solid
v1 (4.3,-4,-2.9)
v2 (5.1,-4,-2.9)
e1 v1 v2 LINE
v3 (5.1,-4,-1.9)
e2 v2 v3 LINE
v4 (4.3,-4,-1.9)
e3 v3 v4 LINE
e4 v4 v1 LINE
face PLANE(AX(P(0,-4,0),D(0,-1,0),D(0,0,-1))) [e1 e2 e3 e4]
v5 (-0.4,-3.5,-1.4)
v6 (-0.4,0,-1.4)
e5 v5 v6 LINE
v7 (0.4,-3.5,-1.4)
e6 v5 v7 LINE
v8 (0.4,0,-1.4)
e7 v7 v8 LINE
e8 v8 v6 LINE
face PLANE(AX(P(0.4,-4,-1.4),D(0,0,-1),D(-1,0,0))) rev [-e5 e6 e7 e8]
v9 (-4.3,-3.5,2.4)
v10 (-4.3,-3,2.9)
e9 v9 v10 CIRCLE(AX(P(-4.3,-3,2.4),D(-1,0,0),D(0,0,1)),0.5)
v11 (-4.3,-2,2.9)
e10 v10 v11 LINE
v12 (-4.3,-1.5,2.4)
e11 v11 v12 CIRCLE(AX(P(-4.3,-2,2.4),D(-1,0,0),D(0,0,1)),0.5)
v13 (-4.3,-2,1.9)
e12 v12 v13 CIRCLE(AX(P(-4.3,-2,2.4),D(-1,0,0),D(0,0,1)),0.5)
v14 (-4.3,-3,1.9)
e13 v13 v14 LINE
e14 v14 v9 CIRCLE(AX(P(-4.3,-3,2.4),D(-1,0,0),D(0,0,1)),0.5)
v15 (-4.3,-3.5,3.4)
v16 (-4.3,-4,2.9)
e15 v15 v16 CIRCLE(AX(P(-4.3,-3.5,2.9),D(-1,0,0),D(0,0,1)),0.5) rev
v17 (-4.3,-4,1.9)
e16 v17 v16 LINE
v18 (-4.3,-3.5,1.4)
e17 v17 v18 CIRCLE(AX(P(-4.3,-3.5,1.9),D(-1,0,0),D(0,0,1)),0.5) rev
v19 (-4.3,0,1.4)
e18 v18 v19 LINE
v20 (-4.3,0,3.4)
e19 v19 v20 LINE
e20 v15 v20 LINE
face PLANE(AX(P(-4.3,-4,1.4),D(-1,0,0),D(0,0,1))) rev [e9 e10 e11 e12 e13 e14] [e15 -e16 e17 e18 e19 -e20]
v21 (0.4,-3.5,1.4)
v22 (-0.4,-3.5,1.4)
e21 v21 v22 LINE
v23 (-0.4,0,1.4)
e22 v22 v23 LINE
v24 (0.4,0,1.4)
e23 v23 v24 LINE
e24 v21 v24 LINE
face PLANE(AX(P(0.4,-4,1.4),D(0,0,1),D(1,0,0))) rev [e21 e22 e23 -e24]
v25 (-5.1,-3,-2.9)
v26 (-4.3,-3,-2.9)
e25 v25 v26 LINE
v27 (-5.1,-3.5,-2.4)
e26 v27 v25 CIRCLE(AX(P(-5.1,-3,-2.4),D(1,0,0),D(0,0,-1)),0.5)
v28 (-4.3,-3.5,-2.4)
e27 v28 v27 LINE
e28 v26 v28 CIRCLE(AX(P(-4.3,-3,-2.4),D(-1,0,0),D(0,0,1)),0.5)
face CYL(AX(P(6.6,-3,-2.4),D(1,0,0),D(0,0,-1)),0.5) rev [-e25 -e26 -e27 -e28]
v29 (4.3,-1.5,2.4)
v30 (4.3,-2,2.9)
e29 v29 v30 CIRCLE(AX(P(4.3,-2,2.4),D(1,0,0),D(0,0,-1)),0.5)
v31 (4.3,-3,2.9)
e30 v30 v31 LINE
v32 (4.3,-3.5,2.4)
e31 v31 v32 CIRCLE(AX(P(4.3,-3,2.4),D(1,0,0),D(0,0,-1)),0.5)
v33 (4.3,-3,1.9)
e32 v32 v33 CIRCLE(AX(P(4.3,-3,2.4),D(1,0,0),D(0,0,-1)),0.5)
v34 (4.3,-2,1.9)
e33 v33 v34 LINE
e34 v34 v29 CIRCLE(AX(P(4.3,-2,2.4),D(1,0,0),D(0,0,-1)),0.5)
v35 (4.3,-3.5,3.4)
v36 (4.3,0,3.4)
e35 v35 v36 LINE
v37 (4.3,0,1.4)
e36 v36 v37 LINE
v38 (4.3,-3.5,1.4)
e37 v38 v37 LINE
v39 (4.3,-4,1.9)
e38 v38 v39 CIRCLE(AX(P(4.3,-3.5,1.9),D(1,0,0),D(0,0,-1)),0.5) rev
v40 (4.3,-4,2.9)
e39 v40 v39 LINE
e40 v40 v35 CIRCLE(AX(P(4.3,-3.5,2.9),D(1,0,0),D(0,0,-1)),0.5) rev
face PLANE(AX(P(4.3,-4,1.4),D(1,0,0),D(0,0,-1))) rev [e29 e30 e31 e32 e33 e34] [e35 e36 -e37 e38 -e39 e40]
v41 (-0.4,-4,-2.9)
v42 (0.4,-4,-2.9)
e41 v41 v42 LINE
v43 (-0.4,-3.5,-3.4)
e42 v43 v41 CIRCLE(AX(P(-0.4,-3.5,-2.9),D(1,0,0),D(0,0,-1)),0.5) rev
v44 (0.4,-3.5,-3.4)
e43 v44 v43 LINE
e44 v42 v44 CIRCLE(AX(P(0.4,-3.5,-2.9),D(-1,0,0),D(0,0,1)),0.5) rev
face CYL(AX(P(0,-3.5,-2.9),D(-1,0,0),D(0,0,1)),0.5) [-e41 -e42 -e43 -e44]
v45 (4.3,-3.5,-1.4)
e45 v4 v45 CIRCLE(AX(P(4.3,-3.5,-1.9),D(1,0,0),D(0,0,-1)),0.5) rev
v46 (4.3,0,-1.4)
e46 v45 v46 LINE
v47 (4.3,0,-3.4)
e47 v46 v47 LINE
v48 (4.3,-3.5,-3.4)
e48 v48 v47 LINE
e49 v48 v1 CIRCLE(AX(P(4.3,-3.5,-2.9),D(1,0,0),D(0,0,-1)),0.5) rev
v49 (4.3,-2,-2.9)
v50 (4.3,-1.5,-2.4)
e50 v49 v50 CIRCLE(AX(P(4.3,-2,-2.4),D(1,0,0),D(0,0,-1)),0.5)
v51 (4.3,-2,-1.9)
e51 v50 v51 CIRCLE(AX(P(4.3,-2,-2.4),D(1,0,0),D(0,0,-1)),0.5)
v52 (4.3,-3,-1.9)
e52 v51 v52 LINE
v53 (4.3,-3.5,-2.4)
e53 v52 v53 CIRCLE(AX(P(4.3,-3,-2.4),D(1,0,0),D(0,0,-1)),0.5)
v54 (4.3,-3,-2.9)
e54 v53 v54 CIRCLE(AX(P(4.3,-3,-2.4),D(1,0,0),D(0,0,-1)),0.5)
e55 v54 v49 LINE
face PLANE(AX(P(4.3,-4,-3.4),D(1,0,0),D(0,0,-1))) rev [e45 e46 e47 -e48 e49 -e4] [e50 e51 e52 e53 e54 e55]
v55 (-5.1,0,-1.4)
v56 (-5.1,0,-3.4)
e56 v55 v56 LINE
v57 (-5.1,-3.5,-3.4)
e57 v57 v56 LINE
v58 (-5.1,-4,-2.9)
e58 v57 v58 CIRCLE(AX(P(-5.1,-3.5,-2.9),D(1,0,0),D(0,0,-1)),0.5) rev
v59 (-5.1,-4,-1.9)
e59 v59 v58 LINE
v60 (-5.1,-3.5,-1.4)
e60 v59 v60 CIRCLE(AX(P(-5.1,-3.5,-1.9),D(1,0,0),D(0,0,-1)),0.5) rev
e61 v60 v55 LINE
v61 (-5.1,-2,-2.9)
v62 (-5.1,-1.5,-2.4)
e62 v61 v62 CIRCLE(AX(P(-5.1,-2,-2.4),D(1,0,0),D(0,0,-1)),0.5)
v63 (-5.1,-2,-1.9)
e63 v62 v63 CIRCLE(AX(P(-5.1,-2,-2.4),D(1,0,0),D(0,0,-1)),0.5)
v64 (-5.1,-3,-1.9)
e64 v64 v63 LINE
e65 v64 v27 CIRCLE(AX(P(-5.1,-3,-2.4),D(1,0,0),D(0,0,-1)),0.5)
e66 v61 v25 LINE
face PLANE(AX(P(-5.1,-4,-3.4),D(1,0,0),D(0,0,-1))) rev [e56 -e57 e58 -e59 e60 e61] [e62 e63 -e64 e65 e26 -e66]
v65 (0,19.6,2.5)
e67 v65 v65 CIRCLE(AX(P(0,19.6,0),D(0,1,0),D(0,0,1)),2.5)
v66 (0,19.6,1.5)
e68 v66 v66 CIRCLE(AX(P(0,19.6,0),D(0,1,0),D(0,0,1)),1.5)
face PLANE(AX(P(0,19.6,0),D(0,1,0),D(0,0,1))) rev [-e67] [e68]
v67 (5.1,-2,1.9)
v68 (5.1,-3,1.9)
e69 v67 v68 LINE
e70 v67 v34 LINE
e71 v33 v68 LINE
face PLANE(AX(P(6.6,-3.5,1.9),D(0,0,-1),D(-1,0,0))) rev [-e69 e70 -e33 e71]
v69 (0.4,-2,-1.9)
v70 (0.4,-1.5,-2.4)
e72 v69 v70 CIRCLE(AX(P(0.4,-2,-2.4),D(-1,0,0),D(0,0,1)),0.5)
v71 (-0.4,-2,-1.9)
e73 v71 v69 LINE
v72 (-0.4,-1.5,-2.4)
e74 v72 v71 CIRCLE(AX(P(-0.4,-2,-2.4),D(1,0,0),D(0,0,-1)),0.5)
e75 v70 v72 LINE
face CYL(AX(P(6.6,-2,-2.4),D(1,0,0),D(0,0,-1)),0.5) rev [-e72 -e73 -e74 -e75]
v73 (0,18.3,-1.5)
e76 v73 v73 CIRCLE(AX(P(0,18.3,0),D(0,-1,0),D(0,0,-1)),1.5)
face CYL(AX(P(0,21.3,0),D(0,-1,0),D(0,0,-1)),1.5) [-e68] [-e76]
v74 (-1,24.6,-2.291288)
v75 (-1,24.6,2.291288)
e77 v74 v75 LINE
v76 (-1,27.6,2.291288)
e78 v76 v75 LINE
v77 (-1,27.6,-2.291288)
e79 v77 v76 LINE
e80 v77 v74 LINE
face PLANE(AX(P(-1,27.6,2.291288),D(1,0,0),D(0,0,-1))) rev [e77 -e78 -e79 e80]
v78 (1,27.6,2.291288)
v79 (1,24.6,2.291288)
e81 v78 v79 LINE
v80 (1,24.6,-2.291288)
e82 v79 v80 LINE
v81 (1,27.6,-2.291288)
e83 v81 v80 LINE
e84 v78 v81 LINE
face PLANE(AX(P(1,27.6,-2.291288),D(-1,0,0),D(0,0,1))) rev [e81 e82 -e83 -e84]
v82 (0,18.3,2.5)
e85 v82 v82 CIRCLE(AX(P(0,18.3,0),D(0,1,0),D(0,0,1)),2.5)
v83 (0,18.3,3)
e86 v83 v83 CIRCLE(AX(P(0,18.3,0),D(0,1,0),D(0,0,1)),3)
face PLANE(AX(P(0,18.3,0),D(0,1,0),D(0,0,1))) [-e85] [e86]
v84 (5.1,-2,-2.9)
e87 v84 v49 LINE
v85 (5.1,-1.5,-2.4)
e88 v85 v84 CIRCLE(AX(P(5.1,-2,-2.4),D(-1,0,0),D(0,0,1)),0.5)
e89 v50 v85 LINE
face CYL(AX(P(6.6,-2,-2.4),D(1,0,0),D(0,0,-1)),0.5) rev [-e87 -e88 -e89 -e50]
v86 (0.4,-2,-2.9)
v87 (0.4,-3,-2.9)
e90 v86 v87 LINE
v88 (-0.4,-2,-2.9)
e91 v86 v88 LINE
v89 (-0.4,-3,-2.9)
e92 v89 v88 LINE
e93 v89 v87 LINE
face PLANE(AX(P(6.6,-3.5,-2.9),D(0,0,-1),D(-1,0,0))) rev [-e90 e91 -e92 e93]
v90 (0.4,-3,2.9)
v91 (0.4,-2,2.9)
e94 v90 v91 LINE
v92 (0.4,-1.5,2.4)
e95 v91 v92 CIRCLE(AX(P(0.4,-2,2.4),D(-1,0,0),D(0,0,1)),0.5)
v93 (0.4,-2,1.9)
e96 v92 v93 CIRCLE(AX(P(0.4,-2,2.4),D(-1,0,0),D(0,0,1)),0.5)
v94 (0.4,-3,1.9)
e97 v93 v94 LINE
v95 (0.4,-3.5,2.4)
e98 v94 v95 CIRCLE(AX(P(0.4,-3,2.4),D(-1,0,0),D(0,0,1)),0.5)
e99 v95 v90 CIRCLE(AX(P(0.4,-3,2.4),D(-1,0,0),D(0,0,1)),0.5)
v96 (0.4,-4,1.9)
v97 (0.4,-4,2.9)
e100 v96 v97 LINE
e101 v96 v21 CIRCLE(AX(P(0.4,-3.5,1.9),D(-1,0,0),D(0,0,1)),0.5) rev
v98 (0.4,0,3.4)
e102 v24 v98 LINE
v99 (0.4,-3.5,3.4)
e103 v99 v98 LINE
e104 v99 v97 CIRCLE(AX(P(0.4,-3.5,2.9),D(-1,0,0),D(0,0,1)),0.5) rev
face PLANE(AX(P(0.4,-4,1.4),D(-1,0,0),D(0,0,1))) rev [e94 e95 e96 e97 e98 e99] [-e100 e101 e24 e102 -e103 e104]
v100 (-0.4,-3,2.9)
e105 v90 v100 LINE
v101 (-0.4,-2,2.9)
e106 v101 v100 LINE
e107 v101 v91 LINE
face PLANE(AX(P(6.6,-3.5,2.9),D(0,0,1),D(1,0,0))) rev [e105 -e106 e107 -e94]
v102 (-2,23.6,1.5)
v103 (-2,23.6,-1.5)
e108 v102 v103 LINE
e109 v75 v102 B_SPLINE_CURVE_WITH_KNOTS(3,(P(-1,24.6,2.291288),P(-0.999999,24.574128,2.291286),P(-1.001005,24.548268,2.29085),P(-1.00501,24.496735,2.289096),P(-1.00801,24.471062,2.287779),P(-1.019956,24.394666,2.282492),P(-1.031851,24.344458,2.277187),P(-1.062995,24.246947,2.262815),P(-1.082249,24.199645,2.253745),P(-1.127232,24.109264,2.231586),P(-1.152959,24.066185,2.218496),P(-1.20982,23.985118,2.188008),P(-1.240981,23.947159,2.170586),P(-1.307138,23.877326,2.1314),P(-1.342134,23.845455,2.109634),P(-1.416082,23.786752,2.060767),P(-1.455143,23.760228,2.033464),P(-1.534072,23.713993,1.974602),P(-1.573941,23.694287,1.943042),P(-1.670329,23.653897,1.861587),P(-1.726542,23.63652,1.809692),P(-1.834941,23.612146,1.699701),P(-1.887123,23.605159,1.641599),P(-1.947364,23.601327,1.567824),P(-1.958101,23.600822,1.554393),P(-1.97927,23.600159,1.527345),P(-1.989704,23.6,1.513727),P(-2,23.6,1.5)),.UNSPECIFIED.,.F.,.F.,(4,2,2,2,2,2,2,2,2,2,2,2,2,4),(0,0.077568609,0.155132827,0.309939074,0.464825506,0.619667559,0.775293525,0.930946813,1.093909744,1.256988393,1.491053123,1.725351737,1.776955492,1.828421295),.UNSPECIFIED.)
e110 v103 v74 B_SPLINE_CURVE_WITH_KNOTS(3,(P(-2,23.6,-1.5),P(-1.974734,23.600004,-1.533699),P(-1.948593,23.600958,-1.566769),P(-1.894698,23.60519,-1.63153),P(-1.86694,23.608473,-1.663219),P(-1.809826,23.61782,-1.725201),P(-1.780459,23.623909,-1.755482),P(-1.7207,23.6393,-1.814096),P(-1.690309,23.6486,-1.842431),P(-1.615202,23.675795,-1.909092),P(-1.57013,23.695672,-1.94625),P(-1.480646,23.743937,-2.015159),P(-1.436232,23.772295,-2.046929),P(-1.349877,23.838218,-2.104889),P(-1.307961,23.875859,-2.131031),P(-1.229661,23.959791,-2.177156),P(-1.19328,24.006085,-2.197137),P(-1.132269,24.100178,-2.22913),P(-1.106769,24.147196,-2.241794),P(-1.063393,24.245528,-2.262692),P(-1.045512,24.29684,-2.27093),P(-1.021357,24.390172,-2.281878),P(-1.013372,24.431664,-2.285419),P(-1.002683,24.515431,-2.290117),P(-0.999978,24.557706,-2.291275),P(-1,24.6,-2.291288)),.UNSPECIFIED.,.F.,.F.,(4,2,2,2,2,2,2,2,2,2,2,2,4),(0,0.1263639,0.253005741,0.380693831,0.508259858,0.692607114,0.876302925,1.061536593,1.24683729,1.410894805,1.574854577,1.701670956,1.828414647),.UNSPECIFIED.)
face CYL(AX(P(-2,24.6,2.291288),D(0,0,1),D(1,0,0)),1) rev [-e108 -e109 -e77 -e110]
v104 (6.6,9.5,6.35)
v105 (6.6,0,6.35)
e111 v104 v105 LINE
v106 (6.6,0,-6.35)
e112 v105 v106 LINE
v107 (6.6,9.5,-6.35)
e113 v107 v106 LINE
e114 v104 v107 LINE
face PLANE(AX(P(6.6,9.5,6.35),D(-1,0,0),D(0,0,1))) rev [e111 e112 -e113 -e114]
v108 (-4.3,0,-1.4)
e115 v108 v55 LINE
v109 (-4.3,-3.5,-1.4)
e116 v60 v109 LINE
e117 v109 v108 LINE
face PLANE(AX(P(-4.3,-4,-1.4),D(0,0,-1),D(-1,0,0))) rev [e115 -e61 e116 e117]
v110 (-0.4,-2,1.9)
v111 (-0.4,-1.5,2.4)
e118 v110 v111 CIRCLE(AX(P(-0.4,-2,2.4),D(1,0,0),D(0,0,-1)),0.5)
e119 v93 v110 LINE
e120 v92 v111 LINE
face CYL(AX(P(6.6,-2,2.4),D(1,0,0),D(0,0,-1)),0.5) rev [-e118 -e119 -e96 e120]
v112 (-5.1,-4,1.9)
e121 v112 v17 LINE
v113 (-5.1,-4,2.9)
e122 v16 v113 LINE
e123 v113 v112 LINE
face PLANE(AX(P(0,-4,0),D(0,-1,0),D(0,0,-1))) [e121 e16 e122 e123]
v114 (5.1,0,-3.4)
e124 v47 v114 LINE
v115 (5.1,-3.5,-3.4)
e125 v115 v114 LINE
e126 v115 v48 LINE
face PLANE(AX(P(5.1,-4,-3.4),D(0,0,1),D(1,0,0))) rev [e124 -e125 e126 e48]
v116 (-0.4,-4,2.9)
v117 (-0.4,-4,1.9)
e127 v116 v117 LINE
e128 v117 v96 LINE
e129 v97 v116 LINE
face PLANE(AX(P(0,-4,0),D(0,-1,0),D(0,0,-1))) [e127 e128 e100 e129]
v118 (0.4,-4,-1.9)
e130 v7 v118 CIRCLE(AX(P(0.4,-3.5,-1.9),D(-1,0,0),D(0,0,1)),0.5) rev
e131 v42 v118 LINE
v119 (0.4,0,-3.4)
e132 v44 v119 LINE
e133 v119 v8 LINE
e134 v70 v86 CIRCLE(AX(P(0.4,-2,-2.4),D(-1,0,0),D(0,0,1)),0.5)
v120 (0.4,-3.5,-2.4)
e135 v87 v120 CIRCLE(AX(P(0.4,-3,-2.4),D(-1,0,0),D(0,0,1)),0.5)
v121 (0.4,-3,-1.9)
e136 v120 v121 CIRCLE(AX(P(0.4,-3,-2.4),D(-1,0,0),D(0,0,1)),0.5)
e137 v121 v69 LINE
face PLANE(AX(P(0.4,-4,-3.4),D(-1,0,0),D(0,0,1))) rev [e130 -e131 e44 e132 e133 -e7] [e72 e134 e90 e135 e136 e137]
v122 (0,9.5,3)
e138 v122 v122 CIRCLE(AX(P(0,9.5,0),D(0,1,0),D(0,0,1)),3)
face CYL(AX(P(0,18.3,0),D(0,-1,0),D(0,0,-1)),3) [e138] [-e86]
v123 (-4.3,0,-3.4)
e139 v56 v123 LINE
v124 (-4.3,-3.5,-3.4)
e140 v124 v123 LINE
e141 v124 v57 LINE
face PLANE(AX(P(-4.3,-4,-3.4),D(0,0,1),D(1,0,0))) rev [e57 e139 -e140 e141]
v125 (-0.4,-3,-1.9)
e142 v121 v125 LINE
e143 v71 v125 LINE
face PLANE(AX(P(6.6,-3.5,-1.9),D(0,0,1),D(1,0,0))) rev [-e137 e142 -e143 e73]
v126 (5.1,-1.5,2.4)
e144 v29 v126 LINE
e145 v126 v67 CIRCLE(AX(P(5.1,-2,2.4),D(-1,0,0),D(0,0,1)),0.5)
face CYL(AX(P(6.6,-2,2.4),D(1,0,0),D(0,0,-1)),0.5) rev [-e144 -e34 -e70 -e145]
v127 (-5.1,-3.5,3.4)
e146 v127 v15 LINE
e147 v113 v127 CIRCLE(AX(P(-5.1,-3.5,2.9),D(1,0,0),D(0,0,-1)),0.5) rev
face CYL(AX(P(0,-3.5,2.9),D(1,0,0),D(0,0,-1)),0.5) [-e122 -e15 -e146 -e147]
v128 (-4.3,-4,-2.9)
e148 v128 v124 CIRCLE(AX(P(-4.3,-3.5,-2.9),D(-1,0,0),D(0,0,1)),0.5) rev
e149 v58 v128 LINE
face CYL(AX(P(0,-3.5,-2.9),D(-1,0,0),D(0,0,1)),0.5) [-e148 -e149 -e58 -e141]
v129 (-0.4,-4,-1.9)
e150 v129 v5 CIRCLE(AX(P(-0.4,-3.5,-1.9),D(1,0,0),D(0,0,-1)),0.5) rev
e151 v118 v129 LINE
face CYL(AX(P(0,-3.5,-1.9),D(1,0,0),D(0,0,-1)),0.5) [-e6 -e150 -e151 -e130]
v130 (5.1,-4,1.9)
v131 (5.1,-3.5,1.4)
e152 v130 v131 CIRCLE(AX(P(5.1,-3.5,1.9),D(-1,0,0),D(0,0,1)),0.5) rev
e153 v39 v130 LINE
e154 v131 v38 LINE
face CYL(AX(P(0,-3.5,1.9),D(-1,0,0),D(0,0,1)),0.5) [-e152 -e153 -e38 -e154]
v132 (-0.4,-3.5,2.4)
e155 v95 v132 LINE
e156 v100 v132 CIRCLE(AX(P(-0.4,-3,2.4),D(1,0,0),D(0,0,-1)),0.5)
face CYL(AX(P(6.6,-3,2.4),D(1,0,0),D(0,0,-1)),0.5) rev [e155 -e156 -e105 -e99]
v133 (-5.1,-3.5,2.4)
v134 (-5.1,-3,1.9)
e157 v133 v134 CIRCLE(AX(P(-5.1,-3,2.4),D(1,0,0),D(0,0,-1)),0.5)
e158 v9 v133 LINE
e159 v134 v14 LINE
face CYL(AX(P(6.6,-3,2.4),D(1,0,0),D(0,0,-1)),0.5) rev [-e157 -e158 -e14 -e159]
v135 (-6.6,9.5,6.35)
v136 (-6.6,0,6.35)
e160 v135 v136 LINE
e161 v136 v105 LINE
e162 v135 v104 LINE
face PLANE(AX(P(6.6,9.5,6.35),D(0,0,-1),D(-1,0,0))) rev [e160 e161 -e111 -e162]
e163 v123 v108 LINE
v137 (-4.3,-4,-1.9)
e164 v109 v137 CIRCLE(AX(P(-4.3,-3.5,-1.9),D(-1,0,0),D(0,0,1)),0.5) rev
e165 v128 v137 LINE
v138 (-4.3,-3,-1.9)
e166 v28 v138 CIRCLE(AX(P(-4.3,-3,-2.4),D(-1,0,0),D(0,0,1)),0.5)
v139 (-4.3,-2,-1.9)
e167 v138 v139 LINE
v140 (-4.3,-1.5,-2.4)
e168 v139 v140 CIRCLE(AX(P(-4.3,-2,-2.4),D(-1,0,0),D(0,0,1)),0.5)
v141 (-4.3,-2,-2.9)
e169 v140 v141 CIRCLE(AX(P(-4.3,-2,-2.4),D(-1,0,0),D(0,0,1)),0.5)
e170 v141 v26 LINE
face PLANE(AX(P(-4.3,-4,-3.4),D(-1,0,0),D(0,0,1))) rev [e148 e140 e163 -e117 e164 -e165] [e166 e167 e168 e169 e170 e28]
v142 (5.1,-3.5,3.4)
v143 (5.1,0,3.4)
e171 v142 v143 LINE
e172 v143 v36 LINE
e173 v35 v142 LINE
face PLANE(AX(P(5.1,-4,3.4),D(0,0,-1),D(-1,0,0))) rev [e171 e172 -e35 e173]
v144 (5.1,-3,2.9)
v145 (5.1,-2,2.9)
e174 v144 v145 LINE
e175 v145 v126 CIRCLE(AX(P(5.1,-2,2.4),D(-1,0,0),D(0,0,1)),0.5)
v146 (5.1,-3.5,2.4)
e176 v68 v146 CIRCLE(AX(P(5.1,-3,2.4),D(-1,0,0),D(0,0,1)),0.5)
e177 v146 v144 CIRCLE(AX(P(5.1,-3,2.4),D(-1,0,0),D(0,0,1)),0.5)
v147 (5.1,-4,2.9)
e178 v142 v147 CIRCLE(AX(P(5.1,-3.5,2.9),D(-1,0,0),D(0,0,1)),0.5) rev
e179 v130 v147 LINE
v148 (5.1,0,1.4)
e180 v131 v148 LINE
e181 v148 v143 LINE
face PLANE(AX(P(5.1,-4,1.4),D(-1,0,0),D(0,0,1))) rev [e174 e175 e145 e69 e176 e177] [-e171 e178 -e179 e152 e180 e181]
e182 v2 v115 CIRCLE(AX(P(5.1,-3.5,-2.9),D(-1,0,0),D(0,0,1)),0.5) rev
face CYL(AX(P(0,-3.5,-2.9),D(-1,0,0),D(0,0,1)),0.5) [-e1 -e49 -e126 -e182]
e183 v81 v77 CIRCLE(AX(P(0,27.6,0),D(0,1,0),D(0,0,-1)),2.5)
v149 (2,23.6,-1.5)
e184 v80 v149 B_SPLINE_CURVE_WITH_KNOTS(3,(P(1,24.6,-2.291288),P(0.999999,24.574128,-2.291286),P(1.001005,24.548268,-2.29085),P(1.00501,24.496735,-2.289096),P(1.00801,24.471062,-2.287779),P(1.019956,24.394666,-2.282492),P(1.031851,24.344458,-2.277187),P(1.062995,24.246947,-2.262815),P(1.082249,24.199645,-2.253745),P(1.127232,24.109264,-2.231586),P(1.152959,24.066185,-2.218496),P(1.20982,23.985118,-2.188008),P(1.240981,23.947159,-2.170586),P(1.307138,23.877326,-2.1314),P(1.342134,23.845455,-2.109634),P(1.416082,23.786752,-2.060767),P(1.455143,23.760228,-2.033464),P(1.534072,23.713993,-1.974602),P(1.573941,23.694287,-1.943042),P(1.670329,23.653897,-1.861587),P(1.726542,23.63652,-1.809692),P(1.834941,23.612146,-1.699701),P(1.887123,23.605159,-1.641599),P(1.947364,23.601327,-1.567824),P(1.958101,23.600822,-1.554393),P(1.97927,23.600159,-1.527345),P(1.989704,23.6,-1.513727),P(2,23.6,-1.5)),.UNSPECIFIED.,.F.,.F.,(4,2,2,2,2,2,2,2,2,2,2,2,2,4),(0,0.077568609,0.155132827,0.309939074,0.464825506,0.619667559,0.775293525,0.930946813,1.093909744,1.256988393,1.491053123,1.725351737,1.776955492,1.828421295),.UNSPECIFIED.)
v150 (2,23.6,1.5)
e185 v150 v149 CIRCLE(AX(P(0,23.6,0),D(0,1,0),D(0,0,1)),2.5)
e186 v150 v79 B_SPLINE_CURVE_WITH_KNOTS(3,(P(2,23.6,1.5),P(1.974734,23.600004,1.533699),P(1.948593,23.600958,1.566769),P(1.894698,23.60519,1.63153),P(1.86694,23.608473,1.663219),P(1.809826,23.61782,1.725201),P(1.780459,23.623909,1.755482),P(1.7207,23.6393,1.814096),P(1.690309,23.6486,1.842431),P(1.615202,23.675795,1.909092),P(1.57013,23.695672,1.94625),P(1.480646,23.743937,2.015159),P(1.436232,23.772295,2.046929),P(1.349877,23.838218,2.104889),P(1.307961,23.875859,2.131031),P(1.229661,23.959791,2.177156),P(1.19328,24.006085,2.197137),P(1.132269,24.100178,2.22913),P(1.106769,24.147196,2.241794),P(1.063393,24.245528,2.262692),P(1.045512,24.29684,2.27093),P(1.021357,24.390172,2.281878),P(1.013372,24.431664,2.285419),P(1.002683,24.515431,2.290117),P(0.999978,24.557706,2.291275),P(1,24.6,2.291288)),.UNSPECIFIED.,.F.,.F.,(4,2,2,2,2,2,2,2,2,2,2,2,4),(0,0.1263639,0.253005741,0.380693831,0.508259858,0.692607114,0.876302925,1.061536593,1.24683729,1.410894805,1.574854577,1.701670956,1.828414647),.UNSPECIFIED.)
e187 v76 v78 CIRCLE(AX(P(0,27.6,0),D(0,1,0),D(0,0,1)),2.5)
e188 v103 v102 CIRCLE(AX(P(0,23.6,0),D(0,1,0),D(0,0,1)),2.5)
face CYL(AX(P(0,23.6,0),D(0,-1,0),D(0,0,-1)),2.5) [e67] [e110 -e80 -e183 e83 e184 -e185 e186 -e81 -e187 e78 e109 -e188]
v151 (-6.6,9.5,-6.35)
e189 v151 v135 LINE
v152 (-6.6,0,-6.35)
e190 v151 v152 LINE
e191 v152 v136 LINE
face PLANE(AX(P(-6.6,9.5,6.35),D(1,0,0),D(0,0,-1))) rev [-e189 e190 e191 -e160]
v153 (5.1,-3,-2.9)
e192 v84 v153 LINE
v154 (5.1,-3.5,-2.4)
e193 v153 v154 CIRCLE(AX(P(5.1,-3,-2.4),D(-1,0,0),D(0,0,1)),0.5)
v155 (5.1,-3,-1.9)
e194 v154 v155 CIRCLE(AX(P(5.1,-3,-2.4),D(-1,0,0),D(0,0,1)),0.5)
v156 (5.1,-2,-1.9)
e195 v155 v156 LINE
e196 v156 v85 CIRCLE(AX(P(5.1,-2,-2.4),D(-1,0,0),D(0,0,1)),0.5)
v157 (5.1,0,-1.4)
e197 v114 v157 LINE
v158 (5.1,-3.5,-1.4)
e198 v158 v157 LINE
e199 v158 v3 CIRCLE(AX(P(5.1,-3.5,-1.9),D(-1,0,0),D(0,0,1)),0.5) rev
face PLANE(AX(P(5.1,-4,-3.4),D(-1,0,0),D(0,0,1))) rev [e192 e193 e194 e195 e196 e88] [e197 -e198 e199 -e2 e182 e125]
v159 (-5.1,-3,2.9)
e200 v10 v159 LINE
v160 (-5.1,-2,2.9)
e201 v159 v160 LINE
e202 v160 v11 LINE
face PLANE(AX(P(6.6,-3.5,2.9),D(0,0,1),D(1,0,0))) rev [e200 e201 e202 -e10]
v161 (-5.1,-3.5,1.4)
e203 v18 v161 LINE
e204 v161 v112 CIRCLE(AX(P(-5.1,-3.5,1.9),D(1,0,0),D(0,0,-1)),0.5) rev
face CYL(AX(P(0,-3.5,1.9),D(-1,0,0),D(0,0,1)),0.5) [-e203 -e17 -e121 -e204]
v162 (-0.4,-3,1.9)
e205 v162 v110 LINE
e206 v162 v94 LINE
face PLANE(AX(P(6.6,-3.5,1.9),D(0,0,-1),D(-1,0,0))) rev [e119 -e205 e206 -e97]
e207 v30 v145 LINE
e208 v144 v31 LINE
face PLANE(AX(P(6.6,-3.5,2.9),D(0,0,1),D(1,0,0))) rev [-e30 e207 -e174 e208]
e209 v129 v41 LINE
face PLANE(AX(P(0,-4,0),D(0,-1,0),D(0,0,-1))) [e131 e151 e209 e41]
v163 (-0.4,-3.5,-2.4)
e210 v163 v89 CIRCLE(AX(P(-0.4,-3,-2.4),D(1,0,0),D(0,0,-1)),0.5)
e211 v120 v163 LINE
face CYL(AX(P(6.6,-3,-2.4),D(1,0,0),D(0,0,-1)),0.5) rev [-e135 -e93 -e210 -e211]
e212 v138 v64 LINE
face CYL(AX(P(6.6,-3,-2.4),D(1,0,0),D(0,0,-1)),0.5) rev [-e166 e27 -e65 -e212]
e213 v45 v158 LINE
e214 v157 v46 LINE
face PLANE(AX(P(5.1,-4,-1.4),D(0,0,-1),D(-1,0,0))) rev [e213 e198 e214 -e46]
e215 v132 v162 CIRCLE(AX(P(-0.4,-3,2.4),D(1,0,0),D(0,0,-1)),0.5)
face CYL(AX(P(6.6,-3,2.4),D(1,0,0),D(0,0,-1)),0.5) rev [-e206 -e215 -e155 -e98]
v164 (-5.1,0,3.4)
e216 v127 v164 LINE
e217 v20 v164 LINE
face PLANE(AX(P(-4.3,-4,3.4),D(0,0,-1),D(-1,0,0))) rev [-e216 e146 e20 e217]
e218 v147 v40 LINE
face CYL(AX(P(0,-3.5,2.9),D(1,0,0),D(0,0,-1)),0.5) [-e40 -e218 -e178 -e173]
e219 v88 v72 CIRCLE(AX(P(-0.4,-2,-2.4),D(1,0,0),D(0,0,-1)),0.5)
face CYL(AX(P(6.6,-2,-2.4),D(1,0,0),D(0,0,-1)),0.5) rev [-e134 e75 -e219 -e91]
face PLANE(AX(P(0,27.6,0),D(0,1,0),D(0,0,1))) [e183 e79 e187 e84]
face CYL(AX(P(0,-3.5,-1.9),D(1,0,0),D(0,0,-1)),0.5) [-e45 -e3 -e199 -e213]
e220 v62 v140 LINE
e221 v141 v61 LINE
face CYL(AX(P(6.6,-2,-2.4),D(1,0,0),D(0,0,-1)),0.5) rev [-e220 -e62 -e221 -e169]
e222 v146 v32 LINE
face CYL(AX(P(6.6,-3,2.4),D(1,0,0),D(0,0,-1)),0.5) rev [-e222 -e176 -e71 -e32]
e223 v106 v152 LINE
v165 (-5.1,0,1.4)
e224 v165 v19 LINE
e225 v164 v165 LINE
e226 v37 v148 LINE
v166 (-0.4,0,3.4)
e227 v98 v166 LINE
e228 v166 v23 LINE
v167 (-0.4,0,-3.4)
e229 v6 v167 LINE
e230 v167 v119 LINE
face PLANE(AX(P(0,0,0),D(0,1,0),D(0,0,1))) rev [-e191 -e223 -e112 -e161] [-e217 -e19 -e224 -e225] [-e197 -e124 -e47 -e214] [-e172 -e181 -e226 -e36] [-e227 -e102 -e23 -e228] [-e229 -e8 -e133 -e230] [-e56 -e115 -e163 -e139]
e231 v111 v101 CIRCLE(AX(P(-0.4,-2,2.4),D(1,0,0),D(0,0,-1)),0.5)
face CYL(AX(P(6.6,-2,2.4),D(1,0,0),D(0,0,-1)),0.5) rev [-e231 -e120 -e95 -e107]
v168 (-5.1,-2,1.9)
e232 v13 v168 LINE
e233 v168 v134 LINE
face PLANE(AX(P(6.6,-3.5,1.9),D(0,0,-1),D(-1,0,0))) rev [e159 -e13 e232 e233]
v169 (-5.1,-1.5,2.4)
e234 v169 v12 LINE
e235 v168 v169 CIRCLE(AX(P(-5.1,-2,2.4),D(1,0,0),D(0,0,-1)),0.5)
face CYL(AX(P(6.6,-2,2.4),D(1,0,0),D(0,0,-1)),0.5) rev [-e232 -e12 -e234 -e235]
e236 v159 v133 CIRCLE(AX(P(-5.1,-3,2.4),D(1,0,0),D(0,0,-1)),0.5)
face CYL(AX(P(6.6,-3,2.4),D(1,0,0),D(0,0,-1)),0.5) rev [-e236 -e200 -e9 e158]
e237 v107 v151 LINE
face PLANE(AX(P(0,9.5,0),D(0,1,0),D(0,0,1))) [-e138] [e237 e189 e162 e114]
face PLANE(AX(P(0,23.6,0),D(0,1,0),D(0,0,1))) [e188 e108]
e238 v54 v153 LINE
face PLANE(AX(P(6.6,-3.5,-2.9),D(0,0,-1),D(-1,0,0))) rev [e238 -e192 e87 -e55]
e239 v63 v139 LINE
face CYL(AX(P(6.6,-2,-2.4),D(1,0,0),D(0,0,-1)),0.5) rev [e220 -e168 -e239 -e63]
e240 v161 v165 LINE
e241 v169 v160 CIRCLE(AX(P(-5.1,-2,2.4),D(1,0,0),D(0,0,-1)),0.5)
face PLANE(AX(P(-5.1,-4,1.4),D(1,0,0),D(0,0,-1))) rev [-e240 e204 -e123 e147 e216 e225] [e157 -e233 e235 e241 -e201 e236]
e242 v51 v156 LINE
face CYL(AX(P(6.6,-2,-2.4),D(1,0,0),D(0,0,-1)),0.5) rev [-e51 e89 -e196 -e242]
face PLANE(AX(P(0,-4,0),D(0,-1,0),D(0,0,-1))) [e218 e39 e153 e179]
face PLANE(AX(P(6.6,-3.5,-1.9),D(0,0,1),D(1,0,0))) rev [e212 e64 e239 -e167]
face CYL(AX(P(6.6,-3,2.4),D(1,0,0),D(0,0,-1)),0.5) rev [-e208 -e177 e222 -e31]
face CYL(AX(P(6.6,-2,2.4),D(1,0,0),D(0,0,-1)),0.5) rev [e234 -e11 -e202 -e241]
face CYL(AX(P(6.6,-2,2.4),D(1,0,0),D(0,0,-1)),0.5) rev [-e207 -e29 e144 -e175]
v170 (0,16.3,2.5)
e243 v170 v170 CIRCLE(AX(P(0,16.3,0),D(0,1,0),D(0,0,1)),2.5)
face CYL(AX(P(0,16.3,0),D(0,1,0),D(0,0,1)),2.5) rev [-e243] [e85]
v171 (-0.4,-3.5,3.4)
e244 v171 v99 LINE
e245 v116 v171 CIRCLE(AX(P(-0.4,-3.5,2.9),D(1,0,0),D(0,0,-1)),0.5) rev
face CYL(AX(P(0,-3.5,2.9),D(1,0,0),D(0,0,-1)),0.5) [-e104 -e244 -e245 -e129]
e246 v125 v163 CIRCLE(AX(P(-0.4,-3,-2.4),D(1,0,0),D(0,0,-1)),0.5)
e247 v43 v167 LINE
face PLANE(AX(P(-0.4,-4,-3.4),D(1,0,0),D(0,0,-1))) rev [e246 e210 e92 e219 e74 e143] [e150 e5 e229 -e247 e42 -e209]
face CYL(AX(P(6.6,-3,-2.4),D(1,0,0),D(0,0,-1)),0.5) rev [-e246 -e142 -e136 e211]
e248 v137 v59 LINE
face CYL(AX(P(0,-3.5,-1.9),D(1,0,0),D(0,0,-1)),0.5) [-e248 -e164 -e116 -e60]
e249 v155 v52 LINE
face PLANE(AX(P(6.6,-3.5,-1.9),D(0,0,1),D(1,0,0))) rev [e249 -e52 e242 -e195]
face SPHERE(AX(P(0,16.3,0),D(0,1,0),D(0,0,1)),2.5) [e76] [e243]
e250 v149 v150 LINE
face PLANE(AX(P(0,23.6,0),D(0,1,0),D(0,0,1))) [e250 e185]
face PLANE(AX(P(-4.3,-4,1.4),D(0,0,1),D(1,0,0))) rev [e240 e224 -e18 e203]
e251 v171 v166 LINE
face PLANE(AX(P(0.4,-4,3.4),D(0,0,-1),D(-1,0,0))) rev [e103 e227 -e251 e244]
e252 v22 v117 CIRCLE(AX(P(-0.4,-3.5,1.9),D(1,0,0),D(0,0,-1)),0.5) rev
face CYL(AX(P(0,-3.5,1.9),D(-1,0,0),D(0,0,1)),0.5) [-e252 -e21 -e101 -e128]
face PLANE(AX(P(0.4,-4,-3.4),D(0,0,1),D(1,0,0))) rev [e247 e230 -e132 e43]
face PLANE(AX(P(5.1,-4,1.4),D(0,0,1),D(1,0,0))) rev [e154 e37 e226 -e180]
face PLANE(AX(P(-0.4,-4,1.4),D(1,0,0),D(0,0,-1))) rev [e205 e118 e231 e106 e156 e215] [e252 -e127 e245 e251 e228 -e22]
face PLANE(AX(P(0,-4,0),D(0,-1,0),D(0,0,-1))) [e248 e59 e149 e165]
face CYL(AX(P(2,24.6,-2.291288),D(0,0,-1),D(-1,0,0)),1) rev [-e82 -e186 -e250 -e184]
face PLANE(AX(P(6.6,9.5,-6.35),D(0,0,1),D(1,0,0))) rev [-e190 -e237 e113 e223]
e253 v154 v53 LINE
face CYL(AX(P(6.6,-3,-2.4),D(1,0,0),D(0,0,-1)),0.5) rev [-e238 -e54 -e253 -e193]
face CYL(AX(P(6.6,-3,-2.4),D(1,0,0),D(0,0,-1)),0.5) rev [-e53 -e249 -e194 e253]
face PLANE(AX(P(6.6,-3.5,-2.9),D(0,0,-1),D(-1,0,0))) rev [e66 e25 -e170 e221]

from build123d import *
from build123d.topology import SkipClean

# Parameters (mm, degrees)
SKETCH1_W           = 13.2
SKETCH1_H           = 12.7
BOSS_EXTRUDE1_DEPTH = 9.5
SKETCH2_R           = 3
BOSS_EXTRUDE2_DEPTH = 8.8
SKETCH4_R           = 2.5
CUT_EXTRUDE1_DEPTH  = 2
SKETCH5_R           = 1.5
BOSS_EXTRUDE3_DEPTH = 5
REVOLVE2_ANGLE      = 180
FILLET1_R           = 1
SKETCH6_W           = 0.8
SKETCH6_H           = 2
BOSS_EXTRUDE4_DEPTH = 4
SKETCH7_W           = 1
SKETCH7_H           = 2
CUT_EXTRUDE2_DEPTH  = 26.117773
FILLET2_R           = 0.5
BOSS_EXTRUDE5_START = 5.3
SKETCH8_R           = 2.5
BOSS_EXTRUDE5_DEPTH = 4
BOSS_EXTRUDE6_START = 4
BOSS_EXTRUDE6_DEPTH = 4
FILLET3_R           = 1


# Some blends are built 0.0001 mm under size
with BuildPart() as part:
    # Sketch1 → Boss-Extrude1 (new body)
    with BuildSketch(Plane(origin=(0, 0, 0), x_dir=(1, 0, 0), z_dir=(0, 1, 0))):
        Rectangle(SKETCH1_W, SKETCH1_H)
    extrude(amount=BOSS_EXTRUDE1_DEPTH)

    # Sketch2 → Boss-Extrude2 (add)
    with BuildSketch(Plane(origin=(0, 9.5, 0), x_dir=(1, 0, 0), z_dir=(0, 1, 0))):
        with Locations(Location((0, 0, 0), (0, 0, 270))):
            Circle(SKETCH2_R)
    extrude(amount=BOSS_EXTRUDE2_DEPTH)

    # Sketch4 → Cut-Extrude1 (cut)
    with BuildSketch(Plane(origin=(0, 18.3, 0), x_dir=(1, 0, 0), z_dir=(0, 1, 0))):
        with Locations(Location((0, 0, 0), (0, 0, 270))):
            Circle(SKETCH4_R)
    extrude(amount=-CUT_EXTRUDE1_DEPTH, mode=Mode.SUBTRACT)

    # Sketch5 → Boss-Extrude3 (add)
    with BuildSketch(Plane(origin=(0, 16.3, 0), x_dir=(1, 0, 0), z_dir=(0, 1, 0))):
        with Locations(Location((0, 0, 0), (0, 0, 270))):
            Circle(SKETCH5_R)
    extrude(amount=BOSS_EXTRUDE3_DEPTH)

    # Sketch3 → Revolve2 (revolve)
    with BuildSketch(Plane(origin=(0, 16.3, 0), x_dir=(1, 0, 0), z_dir=(0, 1, 0))):
        with BuildLine():
            Line((0, -2.5), (0, 2.5))
            ThreePointArc((0, 2.5), (-2.5, 0), (0, -2.5))
        make_face()
    revolve(axis=Axis((0, 16.3, 3), (0, 0, -1)), revolution_arc=REVOLVE2_ANGLE)

    # Fillet1
    fillet1_edges = [part.edges().sort_by_distance(p)[0] for p in [
        (0, 21.3, -1.5),
    ]]
    fillet(fillet1_edges, radius=FILLET1_R)

    # Sketch6 → Boss-Extrude4 (add)
    with BuildSketch(Plane.XZ):
        with Locations((-4.7, 2.4)):
            Rectangle(SKETCH6_W, SKETCH6_H)
        with Locations((-4.7, -2.4)):
            Rectangle(SKETCH6_W, SKETCH6_H)
        with Locations((0, -2.4)):
            Rectangle(SKETCH6_W, SKETCH6_H)
        with Locations((0, 2.4)):
            Rectangle(SKETCH6_W, SKETCH6_H)
        with Locations((4.7, 2.4)):
            Rectangle(SKETCH6_W, SKETCH6_H)
        with Locations((4.7, -2.4)):
            Rectangle(SKETCH6_W, SKETCH6_H)
    extrude(amount=BOSS_EXTRUDE4_DEPTH)

    # Sketch7 → Cut-Extrude2 (cut, through all)
    with BuildSketch(Plane.ZY.offset(5.1)):
        with Locations((-2.4, -2.5)):
            Rectangle(SKETCH7_W, SKETCH7_H)
        with Locations((2.4, -2.5)):
            Rectangle(SKETCH7_W, SKETCH7_H)
    extrude(amount=-CUT_EXTRUDE2_DEPTH, mode=Mode.SUBTRACT)

    # Fillet2
    fillet2_edges = [part.edges().sort_by_distance(p)[0] for p in [
        (4.7, -3.5, 2.9),
        (4.7, -3.5, 1.9),
        (4.7, -3.5, -1.9),
        (4.7, -3.5, -2.9),
        (4.7, -1.5, -1.9),
        (4.7, -1.5, 2.9),
        (4.7, -1.5, 1.9),
        (4.7, -1.5, -2.9),
        (0, -1.5, 1.9),
        (0, -1.5, 2.9),
        (0, -3.5, 2.9),
        (0, -3.5, 1.9),
        (0, -3.5, -1.9),
        (0, -3.5, -2.9),
        (0, -1.5, -2.9),
        (0, -1.5, -1.9),
        (-4.7, -3.5, 2.9),
        (-4.7, -1.5, 2.9),
        (-4.7, -3.5, 1.9),
        (-4.7, -1.5, 1.9),
        (-4.7, -1.5, -1.9),
        (-4.7, -1.5, -2.9),
        (-4.7, -3.5, -1.9),
        (-4.7, -3.5, -2.9),
        (0, -4, -1.4),
        (0, -4, -3.4),
        (4.7, -4, -1.4),
        (4.7, -4, -3.4),
        (4.7, -4, 1.4),
        (4.7, -4, 3.4),
        (0, -4, 3.4),
        (0, -4, 1.4),
        (-4.7, -4, 3.4),
        (-4.7, -4, 1.4),
        (-4.7, -4, -1.4),
        (-4.7, -4, -3.4),
    ]]
    fillet(fillet2_edges, radius=FILLET2_R - 0.0001)  # a hair under: the kernel refuses the full size

    # Sketch8 → Boss-Extrude5 (add)
    with BuildSketch(Plane(origin=(0, 18.3, 0), x_dir=(1, 0, 0), z_dir=(0, 1, 0)).offset(BOSS_EXTRUDE5_START)):
        with Locations(Location((0, 0, 0), (0, 0, 270))):
            Circle(SKETCH8_R)
    extrude(amount=-BOSS_EXTRUDE5_DEPTH)

    # Sketch9 → Boss-Extrude6 (add)
    with SkipClean():  # the faces are left unmerged after this step: merging them gives an invalid solid
        with BuildSketch(Plane(origin=(0, 23.6, 0), x_dir=(1, 0, 0), z_dir=(0, 1, 0)).offset(BOSS_EXTRUDE6_START)):
            with BuildLine():
                Line((-1, -2.291288), (-1, 2.291288))
                ThreePointArc((-1, 2.291288), (0, 2.5), (1, 2.291288))
                Line((1, 2.291288), (1, -2.291288))
                ThreePointArc((1, -2.291288), (0, -2.5), (-1, -2.291288))
            make_face()
        extrude(amount=-BOSS_EXTRUDE6_DEPTH)

    # Fillet3
    # the kernel refuses this fillet: 1 mm, written as the material it adds along each edge
    with BuildSketch(Plane(origin=(1, 23.6, -4.791288), x_dir=(1, 0, 0), z_dir=(0, 0, 1))) as fillet3_piece_1_section:
        with BuildLine():
            CenterArc((FILLET3_R, FILLET3_R), FILLET3_R, 180, 90)
            Line((0, FILLET3_R), (0, 0))
            Line((0, 0), (FILLET3_R, 0))
        make_face()
    fillet3_piece_1 = extrude(amount=9.582576, mode=Mode.PRIVATE)
    fillet3_piece_1 = fillet3_piece_1 & Plane(origin=(0, 23.834238, 0), x_dir=(0, 0, 1), z_dir=(0, 1, 0)) * Cylinder(2.5, 24, mode=Mode.PRIVATE)
    add(fillet3_piece_1)
    with BuildSketch(Plane(origin=(-1, 23.6, 4.791288), x_dir=(-1, 0, 0), z_dir=(0, 0, -1))) as fillet3_piece_2_section:
        with BuildLine():
            CenterArc((FILLET3_R, FILLET3_R), FILLET3_R, 180, 90)
            Line((0, FILLET3_R), (0, 0))
            Line((0, 0), (FILLET3_R, 0))
        make_face()
    fillet3_piece_2 = extrude(amount=9.582576, mode=Mode.PRIVATE)
    fillet3_piece_2 = fillet3_piece_2 & Plane(origin=(0, 23.834238, 0), x_dir=(0, 0, 1), z_dir=(0, 1, 0)) * Cylinder(2.5, 24, mode=Mode.PRIVATE)
    add(fillet3_piece_2)


solid = part.part
